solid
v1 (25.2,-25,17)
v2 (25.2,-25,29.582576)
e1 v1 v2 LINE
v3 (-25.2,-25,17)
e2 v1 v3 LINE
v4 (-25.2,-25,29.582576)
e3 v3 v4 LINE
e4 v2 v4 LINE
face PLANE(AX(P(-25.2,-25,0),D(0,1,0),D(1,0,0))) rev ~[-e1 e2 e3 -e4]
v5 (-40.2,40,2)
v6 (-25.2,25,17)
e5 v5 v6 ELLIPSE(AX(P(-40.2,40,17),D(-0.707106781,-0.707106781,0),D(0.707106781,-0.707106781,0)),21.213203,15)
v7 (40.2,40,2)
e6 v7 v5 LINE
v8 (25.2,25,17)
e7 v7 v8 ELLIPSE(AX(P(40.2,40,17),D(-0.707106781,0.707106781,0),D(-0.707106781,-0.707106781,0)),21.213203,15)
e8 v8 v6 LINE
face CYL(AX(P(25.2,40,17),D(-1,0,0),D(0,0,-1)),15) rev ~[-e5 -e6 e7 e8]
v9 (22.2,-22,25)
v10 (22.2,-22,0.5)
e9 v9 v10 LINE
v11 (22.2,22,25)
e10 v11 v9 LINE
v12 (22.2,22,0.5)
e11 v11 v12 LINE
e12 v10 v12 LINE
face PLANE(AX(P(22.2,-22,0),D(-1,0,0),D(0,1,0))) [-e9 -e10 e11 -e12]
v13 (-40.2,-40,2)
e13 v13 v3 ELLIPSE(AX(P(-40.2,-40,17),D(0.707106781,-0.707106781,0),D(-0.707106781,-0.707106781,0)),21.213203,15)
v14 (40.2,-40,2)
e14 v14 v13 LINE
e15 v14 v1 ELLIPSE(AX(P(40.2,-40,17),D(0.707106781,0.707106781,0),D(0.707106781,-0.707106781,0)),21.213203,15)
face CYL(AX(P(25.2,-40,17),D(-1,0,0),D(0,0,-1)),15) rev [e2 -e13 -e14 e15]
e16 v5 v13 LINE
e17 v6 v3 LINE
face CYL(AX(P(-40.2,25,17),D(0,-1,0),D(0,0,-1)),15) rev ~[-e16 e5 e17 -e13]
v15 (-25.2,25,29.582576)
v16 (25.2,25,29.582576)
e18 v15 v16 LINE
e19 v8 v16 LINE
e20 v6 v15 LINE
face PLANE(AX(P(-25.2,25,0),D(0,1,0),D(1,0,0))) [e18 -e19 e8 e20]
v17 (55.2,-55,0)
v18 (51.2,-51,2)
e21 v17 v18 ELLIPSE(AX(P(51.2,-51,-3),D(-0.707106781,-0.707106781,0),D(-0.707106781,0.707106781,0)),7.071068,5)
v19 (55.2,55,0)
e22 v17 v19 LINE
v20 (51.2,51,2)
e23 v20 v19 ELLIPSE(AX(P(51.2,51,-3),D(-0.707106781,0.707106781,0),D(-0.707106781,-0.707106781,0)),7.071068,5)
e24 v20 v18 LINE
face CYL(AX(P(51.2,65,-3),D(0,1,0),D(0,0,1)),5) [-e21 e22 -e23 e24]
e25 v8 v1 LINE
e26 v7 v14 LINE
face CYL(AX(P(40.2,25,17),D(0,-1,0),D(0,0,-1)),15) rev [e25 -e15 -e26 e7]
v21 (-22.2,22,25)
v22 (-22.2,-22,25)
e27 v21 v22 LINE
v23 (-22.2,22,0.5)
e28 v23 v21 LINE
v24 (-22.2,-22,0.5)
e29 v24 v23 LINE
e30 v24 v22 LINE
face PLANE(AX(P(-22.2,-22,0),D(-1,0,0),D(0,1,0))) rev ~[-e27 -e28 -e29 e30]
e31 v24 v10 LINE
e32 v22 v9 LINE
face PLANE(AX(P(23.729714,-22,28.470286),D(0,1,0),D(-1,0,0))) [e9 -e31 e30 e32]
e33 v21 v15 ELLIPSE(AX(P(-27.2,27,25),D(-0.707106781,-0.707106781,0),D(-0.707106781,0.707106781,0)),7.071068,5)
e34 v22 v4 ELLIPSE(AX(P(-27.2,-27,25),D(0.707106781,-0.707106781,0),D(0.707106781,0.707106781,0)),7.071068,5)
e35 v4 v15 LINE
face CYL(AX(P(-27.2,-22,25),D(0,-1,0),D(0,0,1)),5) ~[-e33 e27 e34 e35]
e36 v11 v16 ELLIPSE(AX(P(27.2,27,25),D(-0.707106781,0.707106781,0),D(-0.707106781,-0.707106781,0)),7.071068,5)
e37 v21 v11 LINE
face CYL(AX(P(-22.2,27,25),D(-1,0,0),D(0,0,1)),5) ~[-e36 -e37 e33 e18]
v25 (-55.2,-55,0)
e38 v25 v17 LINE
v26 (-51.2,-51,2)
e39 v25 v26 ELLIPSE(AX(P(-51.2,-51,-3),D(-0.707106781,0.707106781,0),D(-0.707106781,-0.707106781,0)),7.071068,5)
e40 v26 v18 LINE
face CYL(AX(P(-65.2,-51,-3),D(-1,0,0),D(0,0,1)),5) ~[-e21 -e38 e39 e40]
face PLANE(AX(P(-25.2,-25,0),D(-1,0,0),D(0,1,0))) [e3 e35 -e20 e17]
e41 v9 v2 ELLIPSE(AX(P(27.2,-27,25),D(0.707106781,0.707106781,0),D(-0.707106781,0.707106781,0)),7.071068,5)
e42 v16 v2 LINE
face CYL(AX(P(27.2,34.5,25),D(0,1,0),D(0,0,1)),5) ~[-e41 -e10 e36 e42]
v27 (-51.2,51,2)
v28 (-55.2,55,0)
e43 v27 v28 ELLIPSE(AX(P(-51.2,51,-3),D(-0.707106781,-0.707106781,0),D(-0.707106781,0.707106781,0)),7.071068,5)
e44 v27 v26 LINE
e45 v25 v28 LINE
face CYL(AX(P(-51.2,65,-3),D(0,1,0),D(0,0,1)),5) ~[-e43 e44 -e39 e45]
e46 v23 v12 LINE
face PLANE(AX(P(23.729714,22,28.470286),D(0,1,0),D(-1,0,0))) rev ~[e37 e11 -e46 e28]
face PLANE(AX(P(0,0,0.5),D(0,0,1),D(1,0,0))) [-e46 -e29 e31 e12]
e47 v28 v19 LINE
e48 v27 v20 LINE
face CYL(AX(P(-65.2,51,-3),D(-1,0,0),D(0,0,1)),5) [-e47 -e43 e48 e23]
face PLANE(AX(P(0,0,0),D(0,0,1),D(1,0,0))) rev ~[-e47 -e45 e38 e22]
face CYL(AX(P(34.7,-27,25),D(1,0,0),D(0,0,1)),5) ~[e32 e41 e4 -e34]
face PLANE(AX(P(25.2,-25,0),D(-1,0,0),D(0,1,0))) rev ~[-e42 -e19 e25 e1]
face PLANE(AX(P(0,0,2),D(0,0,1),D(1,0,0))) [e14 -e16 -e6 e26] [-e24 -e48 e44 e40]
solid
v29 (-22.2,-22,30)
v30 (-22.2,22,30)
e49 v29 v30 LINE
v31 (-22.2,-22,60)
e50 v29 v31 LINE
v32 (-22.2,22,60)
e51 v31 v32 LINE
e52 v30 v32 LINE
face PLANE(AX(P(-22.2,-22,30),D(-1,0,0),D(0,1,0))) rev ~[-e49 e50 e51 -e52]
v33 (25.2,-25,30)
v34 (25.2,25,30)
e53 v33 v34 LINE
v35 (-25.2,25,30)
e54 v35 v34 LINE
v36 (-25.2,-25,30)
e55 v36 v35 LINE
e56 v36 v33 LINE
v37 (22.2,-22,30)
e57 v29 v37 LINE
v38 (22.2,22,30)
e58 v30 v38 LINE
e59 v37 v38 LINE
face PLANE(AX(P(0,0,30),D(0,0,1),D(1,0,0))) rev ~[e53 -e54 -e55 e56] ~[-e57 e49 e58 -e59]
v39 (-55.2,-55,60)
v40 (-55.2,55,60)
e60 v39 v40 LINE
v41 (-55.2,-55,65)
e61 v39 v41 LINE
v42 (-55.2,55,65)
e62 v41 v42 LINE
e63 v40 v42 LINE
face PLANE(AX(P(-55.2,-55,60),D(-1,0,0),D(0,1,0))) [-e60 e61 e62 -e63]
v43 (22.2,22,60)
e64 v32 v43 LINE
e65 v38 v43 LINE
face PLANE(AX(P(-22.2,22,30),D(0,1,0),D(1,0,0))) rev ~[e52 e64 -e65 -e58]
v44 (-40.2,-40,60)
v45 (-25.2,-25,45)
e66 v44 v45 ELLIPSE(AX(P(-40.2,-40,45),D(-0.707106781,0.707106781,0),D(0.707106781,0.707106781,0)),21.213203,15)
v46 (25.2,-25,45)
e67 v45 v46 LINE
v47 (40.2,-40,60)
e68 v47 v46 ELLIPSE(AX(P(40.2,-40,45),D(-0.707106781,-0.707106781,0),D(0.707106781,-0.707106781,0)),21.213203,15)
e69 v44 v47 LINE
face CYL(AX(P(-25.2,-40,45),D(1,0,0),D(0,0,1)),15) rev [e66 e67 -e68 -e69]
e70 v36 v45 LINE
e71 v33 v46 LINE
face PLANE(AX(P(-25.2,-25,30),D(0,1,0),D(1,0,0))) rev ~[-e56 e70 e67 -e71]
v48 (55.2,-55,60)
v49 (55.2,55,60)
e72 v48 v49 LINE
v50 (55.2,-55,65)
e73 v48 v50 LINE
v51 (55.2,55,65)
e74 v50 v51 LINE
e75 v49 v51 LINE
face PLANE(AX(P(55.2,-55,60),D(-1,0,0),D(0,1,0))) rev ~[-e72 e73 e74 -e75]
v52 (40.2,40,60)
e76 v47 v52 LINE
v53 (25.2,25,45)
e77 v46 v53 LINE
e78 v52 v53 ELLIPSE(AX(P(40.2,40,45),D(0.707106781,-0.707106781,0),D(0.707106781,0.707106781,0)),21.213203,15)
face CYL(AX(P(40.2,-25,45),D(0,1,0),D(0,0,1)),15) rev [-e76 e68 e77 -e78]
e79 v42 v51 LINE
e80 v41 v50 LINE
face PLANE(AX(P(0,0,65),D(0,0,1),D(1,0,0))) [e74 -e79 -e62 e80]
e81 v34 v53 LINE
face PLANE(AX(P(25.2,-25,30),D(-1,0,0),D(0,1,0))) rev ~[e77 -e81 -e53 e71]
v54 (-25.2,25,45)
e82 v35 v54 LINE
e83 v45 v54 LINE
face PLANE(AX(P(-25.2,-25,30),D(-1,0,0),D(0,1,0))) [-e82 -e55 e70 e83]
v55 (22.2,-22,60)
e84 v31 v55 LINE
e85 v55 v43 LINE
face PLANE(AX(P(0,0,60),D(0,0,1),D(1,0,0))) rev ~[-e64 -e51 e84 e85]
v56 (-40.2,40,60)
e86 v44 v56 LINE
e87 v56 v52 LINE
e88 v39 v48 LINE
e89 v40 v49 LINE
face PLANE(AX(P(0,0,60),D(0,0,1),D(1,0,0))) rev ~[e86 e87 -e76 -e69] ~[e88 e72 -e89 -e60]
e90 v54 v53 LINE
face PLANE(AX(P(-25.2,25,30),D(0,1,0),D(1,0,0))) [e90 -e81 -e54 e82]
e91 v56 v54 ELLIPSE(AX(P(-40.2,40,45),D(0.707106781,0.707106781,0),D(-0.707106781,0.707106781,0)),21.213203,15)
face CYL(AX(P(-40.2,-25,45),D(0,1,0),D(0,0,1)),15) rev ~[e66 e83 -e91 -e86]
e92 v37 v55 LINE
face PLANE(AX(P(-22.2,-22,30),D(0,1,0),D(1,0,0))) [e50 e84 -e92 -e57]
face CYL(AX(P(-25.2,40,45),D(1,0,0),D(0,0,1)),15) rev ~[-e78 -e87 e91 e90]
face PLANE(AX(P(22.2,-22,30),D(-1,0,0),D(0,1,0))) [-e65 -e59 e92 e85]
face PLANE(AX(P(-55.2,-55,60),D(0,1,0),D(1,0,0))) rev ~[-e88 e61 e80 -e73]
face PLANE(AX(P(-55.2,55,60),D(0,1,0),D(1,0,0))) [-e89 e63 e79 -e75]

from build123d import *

# Parameters (mm, degrees)
F0_W         = 110.4
F0_H         = 110
F0_W_2       = 50.4
F0_H_2       = 50
F0_W_3       = 44.4
F0_H_3       = 44
F1_DEPTH     = 2
F2_DEPTH     = 30
F3_DEPTH     = 30
F4_DEPTH     = 0.5
F5_START     = 60
F5_DEPTH     = 5
F6_R         = 15
F6_2_R       = 15
F7_T1_DEPTH  = 130.4
F7_T3_DEPTH  = 130
F8_T1_DEPTH  = 44
F8_T3_DEPTH  = 44.4
F8_T9_DEPTH  = 56.9
F8_T15_DEPTH = 56.5
F8_T24_DEPTH = 56.9
F8_T30_DEPTH = 56.5
F8_T39_DEPTH = 56.5
F8_T45_DEPTH = 56.9
F8_T54_DEPTH = 56.9
F8_T60_DEPTH = 56.5


# Not quite as in the source:
# - a fillet or chamfer that OpenCascade refuses, or shapes differently, is made with other operations: its cross-section is extruded or revolved along the edge and cut away or added


with BuildPart() as f1:
    # F0 (on Top) → F1 (new body)
    with BuildSketch(Plane.XY):
        Rectangle(F0_W, F0_H)
        Rectangle(F0_W_2, F0_H_2, mode=Mode.SUBTRACT)
        Rectangle(F0_W_2, F0_H_2)
        Rectangle(F0_W_3, F0_H_3, mode=Mode.SUBTRACT)
    extrude(amount=F1_DEPTH)

    # F0 (on Top) → F2 (join)
    with BuildSketch(Plane.XY):
        Rectangle(F0_W_2, F0_H_2)
        Rectangle(F0_W_3, F0_H_3, mode=Mode.SUBTRACT)
    extrude(amount=F2_DEPTH)


with BuildPart() as f3:
    # F3 (new): a face of the model
    f3_faces = [f1.part.faces().sort_by_distance(p)[0] for p in [
        (24.4900591574, 0, 30),
    ]]
    extrude(f3_faces, amount=F3_DEPTH)

    # F0 (on Top) → F5 (join)
    with BuildSketch(Plane.XY.offset(F5_START)):
        Rectangle(F0_W, F0_H)
        Rectangle(F0_W_2, F0_H_2, mode=Mode.SUBTRACT)
        Rectangle(F0_W_2, F0_H_2)
        Rectangle(F0_W_3, F0_H_3, mode=Mode.SUBTRACT)
        Rectangle(F0_W_3, F0_H_3)
    extrude(amount=F5_DEPTH)

    # F6#2
    f6_2_edges = [f3.edges().sort_by_distance(p)[0] for p in [
        (0, -25, 60),
        (-25.2, 0, 60),
        (0, 25, 60),
        (25.2, 0, 60),
    ]]
    fillet(f6_2_edges, radius=F6_2_R)


with BuildPart() as f1_1:
    add(f1.part)

    # F0 (on Top) → F4 (join)
    with BuildSketch(Plane.XY):
        Rectangle(F0_W_3, F0_H_3)
    extrude(amount=F4_DEPTH)

    # F6
    f6_edges = [f1_1.edges().sort_by_distance(p)[0] for p in [
        (25.2, 0, 2),
        (0, -25, 2),
        (-25.2, 0, 2),
        (0, 25, 2),
    ]]
    fillet(f6_edges, radius=F6_R)

    # F7: fillet of radius 5 on 4 edges, made by hand

    # F7_s2 → F7_t1 (cut)
    with BuildSketch(Plane.YZ.offset(-65.2)):
        with BuildLine():
            ThreePointArc((51, 2), (53.2360679775, 1.472135955), (55, 0))
            Line((55, 0), (55, 2))
            Line((55, 2), (51, 2))
        make_face()
        with BuildLine():
            ThreePointArc((-51, 2), (-53.2360679775, 1.472135955), (-55, 0))
            Line((-55, 0), (-55, 2))
            Line((-55, 2), (-51, 2))
        make_face()
    extrude(amount=F7_T1_DEPTH, mode=Mode.SUBTRACT)

    # F7_s4 → F7_t3 (cut)
    with BuildSketch(Plane.XZ.offset(-65)):
        with BuildLine():
            ThreePointArc((51.2, 2), (53.4360679775, 1.472135955), (55.2, 0))
            Line((55.2, 0), (55.2, 2))
            Line((55.2, 2), (51.2, 2))
        make_face()
        with BuildLine():
            ThreePointArc((-51.2, 2), (-53.4360679775, 1.472135955), (-55.2, 0))
            Line((-55.2, 0), (-55.2, 2))
            Line((-55.2, 2), (-51.2, 2))
        make_face()
    extrude(amount=F7_T3_DEPTH, mode=Mode.SUBTRACT)

    # F8: fillet of radius 5 on 4 edges, made by hand

    # F8_s2 → F8_t1 (cut)
    with BuildSketch(Plane.XZ.offset(-22)):
        with BuildLine():
            ThreePointArc((-27.2, 30), (-23.6644660941, 28.5355339059), (-22.2, 25))
            Line((-22.2, 25), (-22.2, 30))
            Line((-22.2, 30), (-27.2, 30))
        make_face()
        with BuildLine():
            ThreePointArc((27.2, 30), (23.6644660941, 28.5355339059), (22.2, 25))
            Line((22.2, 25), (22.2, 30))
            Line((22.2, 30), (27.2, 30))
        make_face()
    extrude(amount=F8_T1_DEPTH, mode=Mode.SUBTRACT)

    # F8_s4 → F8_t3 (cut)
    with BuildSketch(Plane.YZ.offset(-22.2)):
        with BuildLine():
            ThreePointArc((-27, 30), (-23.4644660941, 28.5355339059), (-22, 25))
            Line((-22, 25), (-22, 30))
            Line((-22, 30), (-27, 30))
        make_face()
        with BuildLine():
            ThreePointArc((27, 30), (23.4644660941, 28.5355339059), (22, 25))
            Line((22, 25), (22, 30))
            Line((22, 30), (27, 30))
        make_face()
    extrude(amount=F8_T3_DEPTH, mode=Mode.SUBTRACT)


with BuildPart() as f8_tool7:
    # F8_s8 → F8_t9 (new body)
    with BuildSketch(Plane.YZ.offset(22.2)):
        with BuildLine():
            ThreePointArc((-27, 30), (-23.4644660941, 28.5355339059), (-22, 25))
            Line((-22, 25), (-22, 30))
            Line((-22, 30), (-27, 30))
        make_face()
    extrude(amount=-F8_T9_DEPTH)

    split(bisect_by=Plane.XZ.offset(25), keep=Keep.BOTTOM)

    split(bisect_by=Plane.YZ.offset(-25.2), keep=Keep.TOP)

    split(bisect_by=Plane.YZ.offset(-22.2), keep=Keep.BOTTOM)


with BuildPart() as f8_tool13:
    # F8_s14 → F8_t15 (new body)
    with BuildSketch(Plane.XZ.offset(34.5)):
        with BuildLine():
            ThreePointArc((-27.2, 30), (-23.6644660941, 28.5355339059), (-22.2, 25))
            Line((-22.2, 25), (-22.2, 30))
            Line((-22.2, 30), (-27.2, 30))
        make_face()
    extrude(amount=-F8_T15_DEPTH)

    split(bisect_by=Plane.XZ.offset(25), keep=Keep.BOTTOM)

    split(bisect_by=Plane.YZ.offset(-25.2), keep=Keep.TOP)

    split(bisect_by=Plane.XZ.offset(22), keep=Keep.TOP)


with BuildPart() as f8_tool7_1:
    add(f8_tool7.part)

    # F8_t19: intersect F8_tool13
    add(f8_tool13.part, mode=Mode.INTERSECT)


with BuildPart() as f1_2:
    add(f1_1.part)

    # F8_t5: cut F8_tool7
    add(f8_tool7_1.part, mode=Mode.SUBTRACT)


with BuildPart() as f8_tool22:
    # F8_s23 → F8_t24 (new body)
    with BuildSketch(Plane.YZ.offset(-34.7)):
        with BuildLine():
            ThreePointArc((27, 30), (23.4644660941, 28.5355339059), (22, 25))
            Line((22, 25), (22, 30))
            Line((22, 30), (27, 30))
        make_face()
    extrude(amount=F8_T24_DEPTH)

    split(bisect_by=Plane.XZ.offset(-25), keep=Keep.TOP)

    split(bisect_by=Plane.YZ.offset(-25.2), keep=Keep.TOP)

    split(bisect_by=Plane.YZ.offset(-22.2), keep=Keep.BOTTOM)


with BuildPart() as f8_tool28:
    # F8_s29 → F8_t30 (new body)
    with BuildSketch(Plane.XZ.offset(22)):
        with BuildLine():
            ThreePointArc((-27.2, 30), (-23.6644660941, 28.5355339059), (-22.2, 25))
            Line((-22.2, 25), (-22.2, 30))
            Line((-22.2, 30), (-27.2, 30))
        make_face()
    extrude(amount=-F8_T30_DEPTH)

    split(bisect_by=Plane.XZ.offset(-25), keep=Keep.TOP)

    split(bisect_by=Plane.YZ.offset(-25.2), keep=Keep.TOP)

    split(bisect_by=Plane.XZ.offset(-22), keep=Keep.BOTTOM)


with BuildPart() as f8_tool22_1:
    add(f8_tool22.part)

    # F8_t34: intersect F8_tool28
    add(f8_tool28.part, mode=Mode.INTERSECT)


with BuildPart() as f1_3:
    add(f1_2.part)

    # F8_t20: cut F8_tool22
    add(f8_tool22_1.part, mode=Mode.SUBTRACT)


with BuildPart() as f8_tool37:
    # F8_s38 → F8_t39 (new body)
    with BuildSketch(Plane.XZ.offset(-22)):
        with BuildLine():
            ThreePointArc((27.2, 30), (23.6644660941, 28.5355339059), (22.2, 25))
            Line((22.2, 25), (22.2, 30))
            Line((22.2, 30), (27.2, 30))
        make_face()
    extrude(amount=F8_T39_DEPTH)

    split(bisect_by=Plane.YZ.offset(25.2), keep=Keep.BOTTOM)

    split(bisect_by=Plane.XZ.offset(25), keep=Keep.BOTTOM)

    split(bisect_by=Plane.XZ.offset(22), keep=Keep.TOP)


with BuildPart() as f8_tool43:
    # F8_s44 → F8_t45 (new body)
    with BuildSketch(Plane.YZ.offset(34.7)):
        with BuildLine():
            ThreePointArc((-27, 30), (-23.4644660941, 28.5355339059), (-22, 25))
            Line((-22, 25), (-22, 30))
            Line((-22, 30), (-27, 30))
        make_face()
    extrude(amount=-F8_T45_DEPTH)

    split(bisect_by=Plane.YZ.offset(25.2), keep=Keep.BOTTOM)

    split(bisect_by=Plane.XZ.offset(25), keep=Keep.BOTTOM)

    split(bisect_by=Plane.YZ.offset(22.2), keep=Keep.TOP)


with BuildPart() as f8_tool37_1:
    add(f8_tool37.part)

    # F8_t49: intersect F8_tool43
    add(f8_tool43.part, mode=Mode.INTERSECT)


with BuildPart() as f1_4:
    add(f1_3.part)

    # F8_t35: cut F8_tool37
    add(f8_tool37_1.part, mode=Mode.SUBTRACT)


with BuildPart() as f8_tool52:
    # F8_s53 → F8_t54 (new body)
    with BuildSketch(Plane.YZ.offset(-22.2)):
        with BuildLine():
            ThreePointArc((27, 30), (23.4644660941, 28.5355339059), (22, 25))
            Line((22, 25), (22, 30))
            Line((22, 30), (27, 30))
        make_face()
    extrude(amount=F8_T54_DEPTH)

    split(bisect_by=Plane.YZ.offset(25.2), keep=Keep.BOTTOM)

    split(bisect_by=Plane.XZ.offset(-25), keep=Keep.TOP)

    split(bisect_by=Plane.YZ.offset(22.2), keep=Keep.TOP)


with BuildPart() as f8_tool58:
    # F8_s59 → F8_t60 (new body)
    with BuildSketch(Plane.XZ.offset(-34.5)):
        with BuildLine():
            ThreePointArc((27.2, 30), (23.6644660941, 28.5355339059), (22.2, 25))
            Line((22.2, 25), (22.2, 30))
            Line((22.2, 30), (27.2, 30))
        make_face()
    extrude(amount=F8_T60_DEPTH)

    split(bisect_by=Plane.YZ.offset(25.2), keep=Keep.BOTTOM)

    split(bisect_by=Plane.XZ.offset(-25), keep=Keep.TOP)

    split(bisect_by=Plane.XZ.offset(-22), keep=Keep.BOTTOM)


with BuildPart() as f8_tool52_1:
    add(f8_tool52.part)

    # F8_t64: intersect F8_tool58
    add(f8_tool58.part, mode=Mode.INTERSECT)


with BuildPart() as f1_5:
    add(f1_4.part)

    # F8_t50: cut F8_tool52
    add(f8_tool52_1.part, mode=Mode.SUBTRACT)


solid = Compound([f3.part, f1_5.part])
